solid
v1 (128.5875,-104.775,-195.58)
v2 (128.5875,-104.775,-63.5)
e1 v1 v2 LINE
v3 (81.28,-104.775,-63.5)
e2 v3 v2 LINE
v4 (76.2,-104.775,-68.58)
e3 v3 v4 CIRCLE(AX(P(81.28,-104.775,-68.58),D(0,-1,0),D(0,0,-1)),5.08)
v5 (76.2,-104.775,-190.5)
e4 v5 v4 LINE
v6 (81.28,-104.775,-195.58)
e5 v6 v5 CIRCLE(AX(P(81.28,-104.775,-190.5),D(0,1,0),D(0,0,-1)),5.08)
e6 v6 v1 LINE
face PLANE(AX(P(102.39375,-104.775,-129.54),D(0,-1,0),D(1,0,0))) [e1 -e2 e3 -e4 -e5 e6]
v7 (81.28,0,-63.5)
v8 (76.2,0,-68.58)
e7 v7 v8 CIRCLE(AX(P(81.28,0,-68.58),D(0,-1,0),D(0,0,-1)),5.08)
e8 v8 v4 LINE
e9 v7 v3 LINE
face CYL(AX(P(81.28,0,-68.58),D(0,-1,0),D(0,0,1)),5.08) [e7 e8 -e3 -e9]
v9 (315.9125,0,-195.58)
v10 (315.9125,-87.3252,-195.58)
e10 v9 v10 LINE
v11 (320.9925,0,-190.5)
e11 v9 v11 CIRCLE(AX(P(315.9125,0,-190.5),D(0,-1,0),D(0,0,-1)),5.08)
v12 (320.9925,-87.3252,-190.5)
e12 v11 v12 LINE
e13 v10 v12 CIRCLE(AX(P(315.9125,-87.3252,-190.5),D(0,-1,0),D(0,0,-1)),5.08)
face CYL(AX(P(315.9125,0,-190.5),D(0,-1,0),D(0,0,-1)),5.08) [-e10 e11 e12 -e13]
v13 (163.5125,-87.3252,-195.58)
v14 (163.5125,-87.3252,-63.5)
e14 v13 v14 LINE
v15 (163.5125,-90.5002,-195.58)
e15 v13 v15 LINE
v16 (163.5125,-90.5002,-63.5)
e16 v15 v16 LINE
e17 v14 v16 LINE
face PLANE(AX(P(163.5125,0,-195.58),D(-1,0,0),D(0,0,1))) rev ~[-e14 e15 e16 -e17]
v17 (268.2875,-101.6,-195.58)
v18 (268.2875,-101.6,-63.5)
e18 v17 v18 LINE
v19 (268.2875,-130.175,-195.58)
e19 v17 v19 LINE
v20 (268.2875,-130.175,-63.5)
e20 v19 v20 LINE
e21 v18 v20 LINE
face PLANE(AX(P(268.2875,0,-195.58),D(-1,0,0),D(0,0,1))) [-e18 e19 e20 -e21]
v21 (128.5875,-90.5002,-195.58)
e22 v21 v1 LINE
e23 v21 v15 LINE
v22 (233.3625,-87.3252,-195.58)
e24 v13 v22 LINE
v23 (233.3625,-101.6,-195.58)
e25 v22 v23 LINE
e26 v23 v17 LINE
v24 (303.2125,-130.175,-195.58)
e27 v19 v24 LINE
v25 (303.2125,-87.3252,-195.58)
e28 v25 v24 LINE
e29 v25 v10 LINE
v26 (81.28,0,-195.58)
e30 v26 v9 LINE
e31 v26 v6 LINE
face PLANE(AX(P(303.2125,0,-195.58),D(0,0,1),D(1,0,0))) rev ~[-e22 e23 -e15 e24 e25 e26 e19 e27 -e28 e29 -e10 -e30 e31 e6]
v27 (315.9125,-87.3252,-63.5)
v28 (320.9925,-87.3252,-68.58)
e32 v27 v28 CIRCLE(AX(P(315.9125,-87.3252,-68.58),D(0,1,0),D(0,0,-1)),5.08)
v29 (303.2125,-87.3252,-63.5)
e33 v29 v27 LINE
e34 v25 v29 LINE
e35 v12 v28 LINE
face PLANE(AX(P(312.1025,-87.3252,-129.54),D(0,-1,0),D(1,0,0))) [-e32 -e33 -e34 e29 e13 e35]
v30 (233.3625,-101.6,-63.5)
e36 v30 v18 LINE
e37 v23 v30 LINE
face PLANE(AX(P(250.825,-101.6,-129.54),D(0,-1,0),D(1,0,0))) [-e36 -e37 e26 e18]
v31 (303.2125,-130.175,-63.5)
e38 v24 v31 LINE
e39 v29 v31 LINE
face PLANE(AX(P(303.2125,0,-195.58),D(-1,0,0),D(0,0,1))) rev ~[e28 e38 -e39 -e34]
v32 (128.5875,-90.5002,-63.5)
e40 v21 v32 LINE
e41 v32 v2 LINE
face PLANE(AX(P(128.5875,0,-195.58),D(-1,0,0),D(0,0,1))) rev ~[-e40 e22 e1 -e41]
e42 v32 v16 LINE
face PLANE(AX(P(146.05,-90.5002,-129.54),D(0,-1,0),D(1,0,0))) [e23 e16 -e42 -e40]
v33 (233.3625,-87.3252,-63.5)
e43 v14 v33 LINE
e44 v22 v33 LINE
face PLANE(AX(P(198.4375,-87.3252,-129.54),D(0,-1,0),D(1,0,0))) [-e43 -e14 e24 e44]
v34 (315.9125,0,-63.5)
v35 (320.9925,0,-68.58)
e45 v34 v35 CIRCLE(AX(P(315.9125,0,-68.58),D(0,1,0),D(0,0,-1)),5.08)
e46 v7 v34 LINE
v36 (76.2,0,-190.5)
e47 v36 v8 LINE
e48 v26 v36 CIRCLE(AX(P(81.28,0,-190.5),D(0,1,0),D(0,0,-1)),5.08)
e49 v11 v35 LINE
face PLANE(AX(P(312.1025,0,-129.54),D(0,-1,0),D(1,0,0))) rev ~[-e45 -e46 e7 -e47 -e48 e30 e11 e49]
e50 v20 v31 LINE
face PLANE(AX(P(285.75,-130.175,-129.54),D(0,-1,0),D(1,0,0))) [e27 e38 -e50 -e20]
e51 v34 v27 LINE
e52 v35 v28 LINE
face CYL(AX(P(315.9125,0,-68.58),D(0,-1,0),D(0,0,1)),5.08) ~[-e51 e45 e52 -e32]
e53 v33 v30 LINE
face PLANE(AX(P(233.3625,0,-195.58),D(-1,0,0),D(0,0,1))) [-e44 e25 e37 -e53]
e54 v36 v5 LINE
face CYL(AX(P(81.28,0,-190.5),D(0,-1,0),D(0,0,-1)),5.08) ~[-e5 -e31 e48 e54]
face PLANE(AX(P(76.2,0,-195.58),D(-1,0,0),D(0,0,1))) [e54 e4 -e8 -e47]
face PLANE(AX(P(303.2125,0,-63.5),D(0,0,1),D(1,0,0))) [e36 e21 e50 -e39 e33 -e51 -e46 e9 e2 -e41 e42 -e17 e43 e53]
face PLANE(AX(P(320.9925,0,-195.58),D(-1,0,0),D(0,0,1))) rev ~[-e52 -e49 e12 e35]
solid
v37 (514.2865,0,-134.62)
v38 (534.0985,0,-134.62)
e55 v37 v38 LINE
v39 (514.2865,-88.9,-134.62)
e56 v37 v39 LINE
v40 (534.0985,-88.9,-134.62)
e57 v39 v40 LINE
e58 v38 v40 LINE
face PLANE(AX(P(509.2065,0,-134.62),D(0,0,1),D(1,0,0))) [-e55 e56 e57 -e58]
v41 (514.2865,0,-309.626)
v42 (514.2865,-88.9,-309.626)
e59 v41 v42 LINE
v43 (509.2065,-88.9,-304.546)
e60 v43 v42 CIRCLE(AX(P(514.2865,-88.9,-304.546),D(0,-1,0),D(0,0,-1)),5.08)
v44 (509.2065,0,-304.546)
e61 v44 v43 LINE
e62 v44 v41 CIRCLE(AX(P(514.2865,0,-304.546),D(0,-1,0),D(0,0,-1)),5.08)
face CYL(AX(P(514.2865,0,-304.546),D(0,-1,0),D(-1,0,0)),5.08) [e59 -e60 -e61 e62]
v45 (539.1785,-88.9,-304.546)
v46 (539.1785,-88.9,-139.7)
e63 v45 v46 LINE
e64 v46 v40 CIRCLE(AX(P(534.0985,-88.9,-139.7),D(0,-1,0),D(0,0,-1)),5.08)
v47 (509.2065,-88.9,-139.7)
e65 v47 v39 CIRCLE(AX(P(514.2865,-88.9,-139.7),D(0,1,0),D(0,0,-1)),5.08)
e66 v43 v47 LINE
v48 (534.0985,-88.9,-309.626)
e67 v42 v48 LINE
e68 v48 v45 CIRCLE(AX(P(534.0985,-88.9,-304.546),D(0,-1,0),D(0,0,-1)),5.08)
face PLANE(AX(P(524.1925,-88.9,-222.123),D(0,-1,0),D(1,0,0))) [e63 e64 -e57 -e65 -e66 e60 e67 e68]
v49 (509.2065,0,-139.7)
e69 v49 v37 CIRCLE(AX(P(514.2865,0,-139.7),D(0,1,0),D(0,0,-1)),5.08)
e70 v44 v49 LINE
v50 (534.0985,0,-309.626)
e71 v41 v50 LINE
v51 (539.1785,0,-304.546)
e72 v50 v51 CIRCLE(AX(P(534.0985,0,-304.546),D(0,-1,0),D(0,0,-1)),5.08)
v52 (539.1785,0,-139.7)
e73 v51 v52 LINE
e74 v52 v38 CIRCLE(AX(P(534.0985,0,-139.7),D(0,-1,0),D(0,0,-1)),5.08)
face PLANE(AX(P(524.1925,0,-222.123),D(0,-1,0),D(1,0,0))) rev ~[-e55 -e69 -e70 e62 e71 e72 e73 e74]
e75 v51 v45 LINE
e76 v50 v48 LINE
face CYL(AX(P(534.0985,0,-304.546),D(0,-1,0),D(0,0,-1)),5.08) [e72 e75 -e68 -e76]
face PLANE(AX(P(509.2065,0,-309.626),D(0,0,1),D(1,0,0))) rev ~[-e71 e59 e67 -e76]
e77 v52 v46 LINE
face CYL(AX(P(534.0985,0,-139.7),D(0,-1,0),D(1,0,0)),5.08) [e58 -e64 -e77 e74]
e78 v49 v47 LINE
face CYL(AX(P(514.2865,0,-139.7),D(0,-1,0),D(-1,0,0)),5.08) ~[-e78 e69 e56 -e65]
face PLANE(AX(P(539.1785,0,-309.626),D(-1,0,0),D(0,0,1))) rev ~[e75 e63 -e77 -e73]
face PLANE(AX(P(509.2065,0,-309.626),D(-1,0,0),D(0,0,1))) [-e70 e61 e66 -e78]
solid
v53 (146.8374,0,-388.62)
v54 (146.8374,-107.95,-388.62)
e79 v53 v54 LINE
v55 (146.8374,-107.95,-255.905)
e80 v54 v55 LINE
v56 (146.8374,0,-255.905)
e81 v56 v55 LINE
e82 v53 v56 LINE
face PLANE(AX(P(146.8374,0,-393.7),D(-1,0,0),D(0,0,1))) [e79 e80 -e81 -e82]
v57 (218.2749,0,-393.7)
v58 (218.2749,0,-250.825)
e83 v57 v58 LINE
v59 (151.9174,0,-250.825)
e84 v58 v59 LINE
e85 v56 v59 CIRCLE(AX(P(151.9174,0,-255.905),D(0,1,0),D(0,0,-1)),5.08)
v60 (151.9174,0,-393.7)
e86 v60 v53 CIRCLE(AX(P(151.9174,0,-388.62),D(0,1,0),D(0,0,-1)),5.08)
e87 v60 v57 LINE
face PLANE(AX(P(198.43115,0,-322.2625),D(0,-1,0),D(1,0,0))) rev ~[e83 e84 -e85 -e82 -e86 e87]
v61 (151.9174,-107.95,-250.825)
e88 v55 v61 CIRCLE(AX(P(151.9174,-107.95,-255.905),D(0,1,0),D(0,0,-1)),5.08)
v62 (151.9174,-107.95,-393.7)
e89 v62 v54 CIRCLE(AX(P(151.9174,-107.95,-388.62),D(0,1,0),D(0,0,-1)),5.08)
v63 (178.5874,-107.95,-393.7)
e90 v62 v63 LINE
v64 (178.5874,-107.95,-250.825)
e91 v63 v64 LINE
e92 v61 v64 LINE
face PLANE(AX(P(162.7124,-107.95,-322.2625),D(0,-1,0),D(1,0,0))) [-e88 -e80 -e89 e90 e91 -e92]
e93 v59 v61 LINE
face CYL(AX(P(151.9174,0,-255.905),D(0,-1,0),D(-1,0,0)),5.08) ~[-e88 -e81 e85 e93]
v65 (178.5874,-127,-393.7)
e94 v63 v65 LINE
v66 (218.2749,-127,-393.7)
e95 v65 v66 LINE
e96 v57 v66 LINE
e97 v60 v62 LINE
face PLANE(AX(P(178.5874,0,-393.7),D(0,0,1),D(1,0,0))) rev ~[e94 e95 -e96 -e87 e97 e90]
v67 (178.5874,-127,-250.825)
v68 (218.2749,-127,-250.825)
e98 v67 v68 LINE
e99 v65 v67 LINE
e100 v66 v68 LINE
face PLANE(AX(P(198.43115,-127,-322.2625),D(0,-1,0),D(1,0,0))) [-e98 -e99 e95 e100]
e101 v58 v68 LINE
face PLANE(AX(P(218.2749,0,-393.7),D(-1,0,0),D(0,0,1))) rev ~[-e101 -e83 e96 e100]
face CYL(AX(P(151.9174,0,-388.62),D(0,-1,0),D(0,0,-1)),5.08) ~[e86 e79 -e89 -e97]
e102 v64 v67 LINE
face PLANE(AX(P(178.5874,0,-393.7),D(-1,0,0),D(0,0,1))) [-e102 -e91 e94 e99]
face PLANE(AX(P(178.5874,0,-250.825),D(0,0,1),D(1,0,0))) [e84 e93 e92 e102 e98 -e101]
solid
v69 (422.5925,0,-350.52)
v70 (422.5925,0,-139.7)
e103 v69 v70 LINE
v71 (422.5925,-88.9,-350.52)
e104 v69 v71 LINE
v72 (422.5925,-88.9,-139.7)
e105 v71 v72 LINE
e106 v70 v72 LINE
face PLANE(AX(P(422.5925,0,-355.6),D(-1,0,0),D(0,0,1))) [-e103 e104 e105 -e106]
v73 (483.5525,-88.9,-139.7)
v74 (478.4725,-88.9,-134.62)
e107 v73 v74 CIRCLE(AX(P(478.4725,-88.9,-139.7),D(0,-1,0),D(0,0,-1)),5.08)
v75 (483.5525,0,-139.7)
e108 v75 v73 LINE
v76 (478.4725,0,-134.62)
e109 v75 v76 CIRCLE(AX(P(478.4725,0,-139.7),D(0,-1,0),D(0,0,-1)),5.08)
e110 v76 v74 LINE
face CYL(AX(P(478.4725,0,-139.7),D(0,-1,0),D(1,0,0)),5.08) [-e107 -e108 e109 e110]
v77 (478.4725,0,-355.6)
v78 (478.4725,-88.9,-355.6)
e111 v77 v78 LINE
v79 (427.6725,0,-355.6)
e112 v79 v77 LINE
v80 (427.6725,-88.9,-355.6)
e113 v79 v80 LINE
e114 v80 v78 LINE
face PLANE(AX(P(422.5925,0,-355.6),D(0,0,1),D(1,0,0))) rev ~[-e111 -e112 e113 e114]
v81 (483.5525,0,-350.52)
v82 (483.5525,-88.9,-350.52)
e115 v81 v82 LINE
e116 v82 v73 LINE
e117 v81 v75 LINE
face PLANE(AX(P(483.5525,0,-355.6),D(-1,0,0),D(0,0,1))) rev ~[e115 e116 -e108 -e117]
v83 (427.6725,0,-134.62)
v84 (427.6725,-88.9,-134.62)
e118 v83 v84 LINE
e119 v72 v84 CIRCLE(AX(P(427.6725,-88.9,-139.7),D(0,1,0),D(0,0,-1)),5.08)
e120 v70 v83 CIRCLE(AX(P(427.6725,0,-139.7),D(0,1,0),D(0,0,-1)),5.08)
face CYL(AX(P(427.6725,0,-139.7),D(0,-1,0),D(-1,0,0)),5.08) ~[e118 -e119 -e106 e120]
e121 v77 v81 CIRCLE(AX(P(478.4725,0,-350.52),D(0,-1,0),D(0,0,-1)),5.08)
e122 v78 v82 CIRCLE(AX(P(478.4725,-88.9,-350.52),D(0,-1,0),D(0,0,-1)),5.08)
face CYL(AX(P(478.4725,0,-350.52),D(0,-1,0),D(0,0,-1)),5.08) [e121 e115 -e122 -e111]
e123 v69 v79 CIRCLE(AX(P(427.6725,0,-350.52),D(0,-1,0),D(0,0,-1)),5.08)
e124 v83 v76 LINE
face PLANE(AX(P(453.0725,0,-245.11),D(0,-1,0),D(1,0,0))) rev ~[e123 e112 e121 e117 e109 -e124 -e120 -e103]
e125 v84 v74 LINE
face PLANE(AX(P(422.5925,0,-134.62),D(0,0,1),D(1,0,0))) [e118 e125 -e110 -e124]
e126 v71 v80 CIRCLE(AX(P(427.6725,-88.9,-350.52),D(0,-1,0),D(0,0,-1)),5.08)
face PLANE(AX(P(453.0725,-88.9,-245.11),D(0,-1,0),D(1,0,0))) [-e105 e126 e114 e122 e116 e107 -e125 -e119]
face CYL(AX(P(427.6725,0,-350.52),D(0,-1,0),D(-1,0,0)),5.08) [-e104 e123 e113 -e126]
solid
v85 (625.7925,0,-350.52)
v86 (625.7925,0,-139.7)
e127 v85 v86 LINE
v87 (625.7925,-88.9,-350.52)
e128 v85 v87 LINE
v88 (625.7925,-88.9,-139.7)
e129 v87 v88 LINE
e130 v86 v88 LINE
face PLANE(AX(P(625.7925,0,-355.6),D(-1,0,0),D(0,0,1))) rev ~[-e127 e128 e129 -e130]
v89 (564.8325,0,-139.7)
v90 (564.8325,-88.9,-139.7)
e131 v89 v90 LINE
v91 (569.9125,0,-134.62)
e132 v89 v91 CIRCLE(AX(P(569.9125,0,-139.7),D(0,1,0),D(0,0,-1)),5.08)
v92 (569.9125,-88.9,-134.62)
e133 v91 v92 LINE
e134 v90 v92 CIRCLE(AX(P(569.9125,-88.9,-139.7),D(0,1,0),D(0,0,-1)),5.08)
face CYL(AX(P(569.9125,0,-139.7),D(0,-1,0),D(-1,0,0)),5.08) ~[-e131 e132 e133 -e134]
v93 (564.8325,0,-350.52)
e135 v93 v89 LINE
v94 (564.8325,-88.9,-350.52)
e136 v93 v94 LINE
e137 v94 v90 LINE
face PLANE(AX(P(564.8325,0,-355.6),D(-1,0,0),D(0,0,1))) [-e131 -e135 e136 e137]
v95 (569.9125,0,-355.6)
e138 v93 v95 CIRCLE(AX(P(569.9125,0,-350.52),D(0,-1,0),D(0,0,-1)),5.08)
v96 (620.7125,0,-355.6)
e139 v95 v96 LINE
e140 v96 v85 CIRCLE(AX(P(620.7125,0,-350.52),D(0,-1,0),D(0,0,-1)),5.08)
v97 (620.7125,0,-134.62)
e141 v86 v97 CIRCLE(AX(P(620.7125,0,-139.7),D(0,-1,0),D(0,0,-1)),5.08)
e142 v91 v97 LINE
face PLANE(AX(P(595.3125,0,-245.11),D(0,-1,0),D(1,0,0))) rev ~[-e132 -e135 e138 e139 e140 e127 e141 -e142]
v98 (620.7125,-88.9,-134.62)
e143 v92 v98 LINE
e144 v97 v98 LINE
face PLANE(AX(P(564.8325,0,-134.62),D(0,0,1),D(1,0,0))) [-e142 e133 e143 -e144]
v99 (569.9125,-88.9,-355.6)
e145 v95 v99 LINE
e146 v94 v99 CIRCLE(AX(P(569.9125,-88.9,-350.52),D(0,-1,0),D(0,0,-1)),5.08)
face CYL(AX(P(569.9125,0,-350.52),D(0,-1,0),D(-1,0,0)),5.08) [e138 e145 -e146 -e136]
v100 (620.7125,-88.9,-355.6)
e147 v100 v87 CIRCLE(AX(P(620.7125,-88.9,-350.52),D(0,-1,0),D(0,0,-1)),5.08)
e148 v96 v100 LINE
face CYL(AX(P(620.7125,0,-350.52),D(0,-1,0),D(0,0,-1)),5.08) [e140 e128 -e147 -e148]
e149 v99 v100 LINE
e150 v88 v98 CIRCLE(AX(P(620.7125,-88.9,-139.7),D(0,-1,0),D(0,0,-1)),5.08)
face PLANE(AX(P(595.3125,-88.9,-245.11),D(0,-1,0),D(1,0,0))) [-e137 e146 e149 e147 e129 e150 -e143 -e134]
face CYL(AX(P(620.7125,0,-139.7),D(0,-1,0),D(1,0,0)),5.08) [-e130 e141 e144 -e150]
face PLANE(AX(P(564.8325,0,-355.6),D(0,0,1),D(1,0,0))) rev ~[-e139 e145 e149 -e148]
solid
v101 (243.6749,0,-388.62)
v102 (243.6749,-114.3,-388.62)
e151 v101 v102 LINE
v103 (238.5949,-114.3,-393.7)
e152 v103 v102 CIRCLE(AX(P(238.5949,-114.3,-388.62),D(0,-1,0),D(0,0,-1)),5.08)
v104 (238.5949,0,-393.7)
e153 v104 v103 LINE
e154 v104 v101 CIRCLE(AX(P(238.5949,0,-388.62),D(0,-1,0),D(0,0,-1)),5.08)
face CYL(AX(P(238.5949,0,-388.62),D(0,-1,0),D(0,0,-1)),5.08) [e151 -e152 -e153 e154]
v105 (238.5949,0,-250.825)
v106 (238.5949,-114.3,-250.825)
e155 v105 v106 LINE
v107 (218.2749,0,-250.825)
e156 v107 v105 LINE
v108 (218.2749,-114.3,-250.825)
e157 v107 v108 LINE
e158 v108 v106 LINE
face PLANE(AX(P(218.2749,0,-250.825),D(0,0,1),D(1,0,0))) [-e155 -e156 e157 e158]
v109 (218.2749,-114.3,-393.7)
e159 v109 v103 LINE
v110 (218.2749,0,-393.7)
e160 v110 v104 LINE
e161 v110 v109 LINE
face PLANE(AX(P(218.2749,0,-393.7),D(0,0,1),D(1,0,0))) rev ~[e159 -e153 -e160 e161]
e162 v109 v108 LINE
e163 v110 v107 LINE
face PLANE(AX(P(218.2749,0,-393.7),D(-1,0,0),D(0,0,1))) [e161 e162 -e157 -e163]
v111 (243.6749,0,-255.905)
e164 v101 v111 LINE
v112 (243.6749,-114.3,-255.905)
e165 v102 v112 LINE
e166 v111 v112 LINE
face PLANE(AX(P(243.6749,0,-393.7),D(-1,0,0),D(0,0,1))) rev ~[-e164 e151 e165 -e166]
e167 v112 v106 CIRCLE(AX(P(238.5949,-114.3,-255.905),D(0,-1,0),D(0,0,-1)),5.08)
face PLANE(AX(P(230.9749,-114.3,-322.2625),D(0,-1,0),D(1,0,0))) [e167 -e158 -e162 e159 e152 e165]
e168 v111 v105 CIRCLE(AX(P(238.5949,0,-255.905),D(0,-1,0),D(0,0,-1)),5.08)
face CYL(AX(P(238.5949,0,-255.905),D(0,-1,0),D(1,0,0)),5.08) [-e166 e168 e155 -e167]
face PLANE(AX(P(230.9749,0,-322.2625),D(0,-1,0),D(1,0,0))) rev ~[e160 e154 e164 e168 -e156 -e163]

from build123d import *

# Parameters (mm, degrees)
F0_W      = 60.96
F0_H      = 220.98
F1_DEPTH  = 88.9
F0_W_2    = 29.972
F0_H_2    = 175.006
F2_R      = 5.08
F2_2_R    = 5.08
F2_3_R    = 5.08
F3_R      = 5.08
F0_W_3    = 52.3875
F0_H_3    = 132.08
F4_DEPTH  = 104.775
F0_W_4    = 34.925
F5_DEPTH  = 90.5002
F0_W_5    = 69.85
F6_DEPTH  = 87.3252
F7_DEPTH  = 101.6
F8_DEPTH  = 130.175
F0_W_6    = 17.78
F9_DEPTH  = 87.3252
F0_W_7    = 31.75
F0_H_4    = 142.875
F10_DEPTH = 107.95
F0_W_8    = 39.6875
F11_DEPTH = 127
F0_W_9    = 25.4
F12_DEPTH = 114.3
F13_R     = 5.08
F13_2_R   = 5.08
F13_3_R   = 5.08


with BuildPart() as f1:
    # F0 (on Front) → F1 (new body)
    with BuildSketch(Plane.XZ):
        with Locations((453.0725, -245.11)):
            Rectangle(F0_W, F0_H)
    extrude(amount=F1_DEPTH)

    # F2
    f2_edges = [f1.edges().sort_by_distance(p)[0] for p in [
        (483.5525, -44.45, -134.62),
        (422.5925, -44.45, -134.62),
        (422.5925, -44.45, -355.6),
        (483.5525, -44.45, -355.6),
    ]]
    fillet(f2_edges, radius=F2_R)


with BuildPart() as f1b:
    # F0 (on Front) → F1, piece 2 (new body)
    with BuildSketch(Plane.XZ):
        with Locations((595.3125, -245.11)):
            Rectangle(F0_W, F0_H)
    extrude(amount=F1_DEPTH)

    # F2#2
    f2_2_edges = [f1b.edges().sort_by_distance(p)[0] for p in [
        (625.7925, -44.45, -134.62),
        (564.8325, -44.45, -134.62),
        (564.8325, -44.45, -355.6),
        (625.7925, -44.45, -355.6),
    ]]
    fillet(f2_2_edges, radius=F2_2_R)


with BuildPart() as f1c:
    # F0 (on Front) → F1, piece 3 (new body)
    with BuildSketch(Plane.XZ):
        with Locations((524.1925, -222.123)):
            Rectangle(F0_W_2, F0_H_2)
    extrude(amount=F1_DEPTH)

    # F2#3
    f2_3_edges = [f1c.edges().sort_by_distance(p)[0] for p in [
        (539.1785, -44.45, -134.62),
        (509.2065, -44.45, -309.626),
        (539.1785, -44.45, -309.626),
    ]]
    fillet(f2_3_edges, radius=F2_3_R)

    # F3
    f3_edges = [f1c.edges().sort_by_distance(p)[0] for p in [
        (509.2065, -44.45, -134.62),
    ]]
    fillet(f3_edges, radius=F3_R)


with BuildPart() as f4:
    # F0 (on Front) → F4 (new body)
    with BuildSketch(Plane.XZ):
        with Locations((102.39375, -129.54)):
            Rectangle(F0_W_3, F0_H_3)
    extrude(amount=F4_DEPTH)

    # F0 (on Front) → F5 (join)
    with BuildSketch(Plane.XZ):
        with Locations((146.05, -129.54)):
            Rectangle(F0_W_4, F0_H_3)
    extrude(amount=F5_DEPTH)

    # F0 (on Front) → F6 (join)
    with BuildSketch(Plane.XZ):
        with Locations((198.4375, -129.54)):
            Rectangle(F0_W_5, F0_H_3)
    extrude(amount=F6_DEPTH)

    # F0 (on Front) → F7 (join)
    with BuildSketch(Plane.XZ):
        with Locations((250.825, -129.54)):
            Rectangle(F0_W_4, F0_H_3)
    extrude(amount=F7_DEPTH)

    # F0 (on Front) → F8 (join)
    with BuildSketch(Plane.XZ):
        with Locations((285.75, -129.54)):
            Rectangle(F0_W_4, F0_H_3)
    extrude(amount=F8_DEPTH)

    # F0 (on Front) → F9 (join)
    with BuildSketch(Plane.XZ):
        with Locations((312.1025, -129.54)):
            Rectangle(F0_W_6, F0_H_3)
    extrude(amount=F9_DEPTH)

    # F13
    f13_edges = [f4.edges().sort_by_distance(p)[0] for p in [
        (320.9925, -43.6626, -63.5),
        (76.2, -52.3875, -63.5),
        (320.9925, -43.6626, -195.58),
        (76.2, -52.3875, -195.58),
    ]]
    fillet(f13_edges, radius=F13_R)


with BuildPart() as f10:
    # F0 (on Front) → F10 (new body)
    with BuildSketch(Plane.XZ):
        with Locations((162.7124, -322.2625)):
            Rectangle(F0_W_7, F0_H_4)
    extrude(amount=F10_DEPTH)

    # F0 (on Front) → F11 (join)
    with BuildSketch(Plane.XZ):
        with Locations((198.43115, -322.2625)):
            Rectangle(F0_W_8, F0_H_4)
    extrude(amount=F11_DEPTH)

    # F13#2
    f13_2_edges = [f10.edges().sort_by_distance(p)[0] for p in [
        (146.8374, -53.975, -250.825),
        (146.8374, -53.975, -393.7),
    ]]
    fillet(f13_2_edges, radius=F13_2_R)


with BuildPart() as f12:
    # F0 (on Front) → F12 (new body)
    with BuildSketch(Plane.XZ):
        with Locations((230.9749, -322.2625)):
            Rectangle(F0_W_9, F0_H_4)
    extrude(amount=F12_DEPTH)

    # F13#3
    f13_3_edges = [f12.edges().sort_by_distance(p)[0] for p in [
        (243.6749, -57.15, -250.825),
        (243.6749, -57.15, -393.7),
    ]]
    fillet(f13_3_edges, radius=F13_3_R)


solid = Compound([f1.part, f1b.part, f1c.part, f4.part, f10.part, f12.part])
